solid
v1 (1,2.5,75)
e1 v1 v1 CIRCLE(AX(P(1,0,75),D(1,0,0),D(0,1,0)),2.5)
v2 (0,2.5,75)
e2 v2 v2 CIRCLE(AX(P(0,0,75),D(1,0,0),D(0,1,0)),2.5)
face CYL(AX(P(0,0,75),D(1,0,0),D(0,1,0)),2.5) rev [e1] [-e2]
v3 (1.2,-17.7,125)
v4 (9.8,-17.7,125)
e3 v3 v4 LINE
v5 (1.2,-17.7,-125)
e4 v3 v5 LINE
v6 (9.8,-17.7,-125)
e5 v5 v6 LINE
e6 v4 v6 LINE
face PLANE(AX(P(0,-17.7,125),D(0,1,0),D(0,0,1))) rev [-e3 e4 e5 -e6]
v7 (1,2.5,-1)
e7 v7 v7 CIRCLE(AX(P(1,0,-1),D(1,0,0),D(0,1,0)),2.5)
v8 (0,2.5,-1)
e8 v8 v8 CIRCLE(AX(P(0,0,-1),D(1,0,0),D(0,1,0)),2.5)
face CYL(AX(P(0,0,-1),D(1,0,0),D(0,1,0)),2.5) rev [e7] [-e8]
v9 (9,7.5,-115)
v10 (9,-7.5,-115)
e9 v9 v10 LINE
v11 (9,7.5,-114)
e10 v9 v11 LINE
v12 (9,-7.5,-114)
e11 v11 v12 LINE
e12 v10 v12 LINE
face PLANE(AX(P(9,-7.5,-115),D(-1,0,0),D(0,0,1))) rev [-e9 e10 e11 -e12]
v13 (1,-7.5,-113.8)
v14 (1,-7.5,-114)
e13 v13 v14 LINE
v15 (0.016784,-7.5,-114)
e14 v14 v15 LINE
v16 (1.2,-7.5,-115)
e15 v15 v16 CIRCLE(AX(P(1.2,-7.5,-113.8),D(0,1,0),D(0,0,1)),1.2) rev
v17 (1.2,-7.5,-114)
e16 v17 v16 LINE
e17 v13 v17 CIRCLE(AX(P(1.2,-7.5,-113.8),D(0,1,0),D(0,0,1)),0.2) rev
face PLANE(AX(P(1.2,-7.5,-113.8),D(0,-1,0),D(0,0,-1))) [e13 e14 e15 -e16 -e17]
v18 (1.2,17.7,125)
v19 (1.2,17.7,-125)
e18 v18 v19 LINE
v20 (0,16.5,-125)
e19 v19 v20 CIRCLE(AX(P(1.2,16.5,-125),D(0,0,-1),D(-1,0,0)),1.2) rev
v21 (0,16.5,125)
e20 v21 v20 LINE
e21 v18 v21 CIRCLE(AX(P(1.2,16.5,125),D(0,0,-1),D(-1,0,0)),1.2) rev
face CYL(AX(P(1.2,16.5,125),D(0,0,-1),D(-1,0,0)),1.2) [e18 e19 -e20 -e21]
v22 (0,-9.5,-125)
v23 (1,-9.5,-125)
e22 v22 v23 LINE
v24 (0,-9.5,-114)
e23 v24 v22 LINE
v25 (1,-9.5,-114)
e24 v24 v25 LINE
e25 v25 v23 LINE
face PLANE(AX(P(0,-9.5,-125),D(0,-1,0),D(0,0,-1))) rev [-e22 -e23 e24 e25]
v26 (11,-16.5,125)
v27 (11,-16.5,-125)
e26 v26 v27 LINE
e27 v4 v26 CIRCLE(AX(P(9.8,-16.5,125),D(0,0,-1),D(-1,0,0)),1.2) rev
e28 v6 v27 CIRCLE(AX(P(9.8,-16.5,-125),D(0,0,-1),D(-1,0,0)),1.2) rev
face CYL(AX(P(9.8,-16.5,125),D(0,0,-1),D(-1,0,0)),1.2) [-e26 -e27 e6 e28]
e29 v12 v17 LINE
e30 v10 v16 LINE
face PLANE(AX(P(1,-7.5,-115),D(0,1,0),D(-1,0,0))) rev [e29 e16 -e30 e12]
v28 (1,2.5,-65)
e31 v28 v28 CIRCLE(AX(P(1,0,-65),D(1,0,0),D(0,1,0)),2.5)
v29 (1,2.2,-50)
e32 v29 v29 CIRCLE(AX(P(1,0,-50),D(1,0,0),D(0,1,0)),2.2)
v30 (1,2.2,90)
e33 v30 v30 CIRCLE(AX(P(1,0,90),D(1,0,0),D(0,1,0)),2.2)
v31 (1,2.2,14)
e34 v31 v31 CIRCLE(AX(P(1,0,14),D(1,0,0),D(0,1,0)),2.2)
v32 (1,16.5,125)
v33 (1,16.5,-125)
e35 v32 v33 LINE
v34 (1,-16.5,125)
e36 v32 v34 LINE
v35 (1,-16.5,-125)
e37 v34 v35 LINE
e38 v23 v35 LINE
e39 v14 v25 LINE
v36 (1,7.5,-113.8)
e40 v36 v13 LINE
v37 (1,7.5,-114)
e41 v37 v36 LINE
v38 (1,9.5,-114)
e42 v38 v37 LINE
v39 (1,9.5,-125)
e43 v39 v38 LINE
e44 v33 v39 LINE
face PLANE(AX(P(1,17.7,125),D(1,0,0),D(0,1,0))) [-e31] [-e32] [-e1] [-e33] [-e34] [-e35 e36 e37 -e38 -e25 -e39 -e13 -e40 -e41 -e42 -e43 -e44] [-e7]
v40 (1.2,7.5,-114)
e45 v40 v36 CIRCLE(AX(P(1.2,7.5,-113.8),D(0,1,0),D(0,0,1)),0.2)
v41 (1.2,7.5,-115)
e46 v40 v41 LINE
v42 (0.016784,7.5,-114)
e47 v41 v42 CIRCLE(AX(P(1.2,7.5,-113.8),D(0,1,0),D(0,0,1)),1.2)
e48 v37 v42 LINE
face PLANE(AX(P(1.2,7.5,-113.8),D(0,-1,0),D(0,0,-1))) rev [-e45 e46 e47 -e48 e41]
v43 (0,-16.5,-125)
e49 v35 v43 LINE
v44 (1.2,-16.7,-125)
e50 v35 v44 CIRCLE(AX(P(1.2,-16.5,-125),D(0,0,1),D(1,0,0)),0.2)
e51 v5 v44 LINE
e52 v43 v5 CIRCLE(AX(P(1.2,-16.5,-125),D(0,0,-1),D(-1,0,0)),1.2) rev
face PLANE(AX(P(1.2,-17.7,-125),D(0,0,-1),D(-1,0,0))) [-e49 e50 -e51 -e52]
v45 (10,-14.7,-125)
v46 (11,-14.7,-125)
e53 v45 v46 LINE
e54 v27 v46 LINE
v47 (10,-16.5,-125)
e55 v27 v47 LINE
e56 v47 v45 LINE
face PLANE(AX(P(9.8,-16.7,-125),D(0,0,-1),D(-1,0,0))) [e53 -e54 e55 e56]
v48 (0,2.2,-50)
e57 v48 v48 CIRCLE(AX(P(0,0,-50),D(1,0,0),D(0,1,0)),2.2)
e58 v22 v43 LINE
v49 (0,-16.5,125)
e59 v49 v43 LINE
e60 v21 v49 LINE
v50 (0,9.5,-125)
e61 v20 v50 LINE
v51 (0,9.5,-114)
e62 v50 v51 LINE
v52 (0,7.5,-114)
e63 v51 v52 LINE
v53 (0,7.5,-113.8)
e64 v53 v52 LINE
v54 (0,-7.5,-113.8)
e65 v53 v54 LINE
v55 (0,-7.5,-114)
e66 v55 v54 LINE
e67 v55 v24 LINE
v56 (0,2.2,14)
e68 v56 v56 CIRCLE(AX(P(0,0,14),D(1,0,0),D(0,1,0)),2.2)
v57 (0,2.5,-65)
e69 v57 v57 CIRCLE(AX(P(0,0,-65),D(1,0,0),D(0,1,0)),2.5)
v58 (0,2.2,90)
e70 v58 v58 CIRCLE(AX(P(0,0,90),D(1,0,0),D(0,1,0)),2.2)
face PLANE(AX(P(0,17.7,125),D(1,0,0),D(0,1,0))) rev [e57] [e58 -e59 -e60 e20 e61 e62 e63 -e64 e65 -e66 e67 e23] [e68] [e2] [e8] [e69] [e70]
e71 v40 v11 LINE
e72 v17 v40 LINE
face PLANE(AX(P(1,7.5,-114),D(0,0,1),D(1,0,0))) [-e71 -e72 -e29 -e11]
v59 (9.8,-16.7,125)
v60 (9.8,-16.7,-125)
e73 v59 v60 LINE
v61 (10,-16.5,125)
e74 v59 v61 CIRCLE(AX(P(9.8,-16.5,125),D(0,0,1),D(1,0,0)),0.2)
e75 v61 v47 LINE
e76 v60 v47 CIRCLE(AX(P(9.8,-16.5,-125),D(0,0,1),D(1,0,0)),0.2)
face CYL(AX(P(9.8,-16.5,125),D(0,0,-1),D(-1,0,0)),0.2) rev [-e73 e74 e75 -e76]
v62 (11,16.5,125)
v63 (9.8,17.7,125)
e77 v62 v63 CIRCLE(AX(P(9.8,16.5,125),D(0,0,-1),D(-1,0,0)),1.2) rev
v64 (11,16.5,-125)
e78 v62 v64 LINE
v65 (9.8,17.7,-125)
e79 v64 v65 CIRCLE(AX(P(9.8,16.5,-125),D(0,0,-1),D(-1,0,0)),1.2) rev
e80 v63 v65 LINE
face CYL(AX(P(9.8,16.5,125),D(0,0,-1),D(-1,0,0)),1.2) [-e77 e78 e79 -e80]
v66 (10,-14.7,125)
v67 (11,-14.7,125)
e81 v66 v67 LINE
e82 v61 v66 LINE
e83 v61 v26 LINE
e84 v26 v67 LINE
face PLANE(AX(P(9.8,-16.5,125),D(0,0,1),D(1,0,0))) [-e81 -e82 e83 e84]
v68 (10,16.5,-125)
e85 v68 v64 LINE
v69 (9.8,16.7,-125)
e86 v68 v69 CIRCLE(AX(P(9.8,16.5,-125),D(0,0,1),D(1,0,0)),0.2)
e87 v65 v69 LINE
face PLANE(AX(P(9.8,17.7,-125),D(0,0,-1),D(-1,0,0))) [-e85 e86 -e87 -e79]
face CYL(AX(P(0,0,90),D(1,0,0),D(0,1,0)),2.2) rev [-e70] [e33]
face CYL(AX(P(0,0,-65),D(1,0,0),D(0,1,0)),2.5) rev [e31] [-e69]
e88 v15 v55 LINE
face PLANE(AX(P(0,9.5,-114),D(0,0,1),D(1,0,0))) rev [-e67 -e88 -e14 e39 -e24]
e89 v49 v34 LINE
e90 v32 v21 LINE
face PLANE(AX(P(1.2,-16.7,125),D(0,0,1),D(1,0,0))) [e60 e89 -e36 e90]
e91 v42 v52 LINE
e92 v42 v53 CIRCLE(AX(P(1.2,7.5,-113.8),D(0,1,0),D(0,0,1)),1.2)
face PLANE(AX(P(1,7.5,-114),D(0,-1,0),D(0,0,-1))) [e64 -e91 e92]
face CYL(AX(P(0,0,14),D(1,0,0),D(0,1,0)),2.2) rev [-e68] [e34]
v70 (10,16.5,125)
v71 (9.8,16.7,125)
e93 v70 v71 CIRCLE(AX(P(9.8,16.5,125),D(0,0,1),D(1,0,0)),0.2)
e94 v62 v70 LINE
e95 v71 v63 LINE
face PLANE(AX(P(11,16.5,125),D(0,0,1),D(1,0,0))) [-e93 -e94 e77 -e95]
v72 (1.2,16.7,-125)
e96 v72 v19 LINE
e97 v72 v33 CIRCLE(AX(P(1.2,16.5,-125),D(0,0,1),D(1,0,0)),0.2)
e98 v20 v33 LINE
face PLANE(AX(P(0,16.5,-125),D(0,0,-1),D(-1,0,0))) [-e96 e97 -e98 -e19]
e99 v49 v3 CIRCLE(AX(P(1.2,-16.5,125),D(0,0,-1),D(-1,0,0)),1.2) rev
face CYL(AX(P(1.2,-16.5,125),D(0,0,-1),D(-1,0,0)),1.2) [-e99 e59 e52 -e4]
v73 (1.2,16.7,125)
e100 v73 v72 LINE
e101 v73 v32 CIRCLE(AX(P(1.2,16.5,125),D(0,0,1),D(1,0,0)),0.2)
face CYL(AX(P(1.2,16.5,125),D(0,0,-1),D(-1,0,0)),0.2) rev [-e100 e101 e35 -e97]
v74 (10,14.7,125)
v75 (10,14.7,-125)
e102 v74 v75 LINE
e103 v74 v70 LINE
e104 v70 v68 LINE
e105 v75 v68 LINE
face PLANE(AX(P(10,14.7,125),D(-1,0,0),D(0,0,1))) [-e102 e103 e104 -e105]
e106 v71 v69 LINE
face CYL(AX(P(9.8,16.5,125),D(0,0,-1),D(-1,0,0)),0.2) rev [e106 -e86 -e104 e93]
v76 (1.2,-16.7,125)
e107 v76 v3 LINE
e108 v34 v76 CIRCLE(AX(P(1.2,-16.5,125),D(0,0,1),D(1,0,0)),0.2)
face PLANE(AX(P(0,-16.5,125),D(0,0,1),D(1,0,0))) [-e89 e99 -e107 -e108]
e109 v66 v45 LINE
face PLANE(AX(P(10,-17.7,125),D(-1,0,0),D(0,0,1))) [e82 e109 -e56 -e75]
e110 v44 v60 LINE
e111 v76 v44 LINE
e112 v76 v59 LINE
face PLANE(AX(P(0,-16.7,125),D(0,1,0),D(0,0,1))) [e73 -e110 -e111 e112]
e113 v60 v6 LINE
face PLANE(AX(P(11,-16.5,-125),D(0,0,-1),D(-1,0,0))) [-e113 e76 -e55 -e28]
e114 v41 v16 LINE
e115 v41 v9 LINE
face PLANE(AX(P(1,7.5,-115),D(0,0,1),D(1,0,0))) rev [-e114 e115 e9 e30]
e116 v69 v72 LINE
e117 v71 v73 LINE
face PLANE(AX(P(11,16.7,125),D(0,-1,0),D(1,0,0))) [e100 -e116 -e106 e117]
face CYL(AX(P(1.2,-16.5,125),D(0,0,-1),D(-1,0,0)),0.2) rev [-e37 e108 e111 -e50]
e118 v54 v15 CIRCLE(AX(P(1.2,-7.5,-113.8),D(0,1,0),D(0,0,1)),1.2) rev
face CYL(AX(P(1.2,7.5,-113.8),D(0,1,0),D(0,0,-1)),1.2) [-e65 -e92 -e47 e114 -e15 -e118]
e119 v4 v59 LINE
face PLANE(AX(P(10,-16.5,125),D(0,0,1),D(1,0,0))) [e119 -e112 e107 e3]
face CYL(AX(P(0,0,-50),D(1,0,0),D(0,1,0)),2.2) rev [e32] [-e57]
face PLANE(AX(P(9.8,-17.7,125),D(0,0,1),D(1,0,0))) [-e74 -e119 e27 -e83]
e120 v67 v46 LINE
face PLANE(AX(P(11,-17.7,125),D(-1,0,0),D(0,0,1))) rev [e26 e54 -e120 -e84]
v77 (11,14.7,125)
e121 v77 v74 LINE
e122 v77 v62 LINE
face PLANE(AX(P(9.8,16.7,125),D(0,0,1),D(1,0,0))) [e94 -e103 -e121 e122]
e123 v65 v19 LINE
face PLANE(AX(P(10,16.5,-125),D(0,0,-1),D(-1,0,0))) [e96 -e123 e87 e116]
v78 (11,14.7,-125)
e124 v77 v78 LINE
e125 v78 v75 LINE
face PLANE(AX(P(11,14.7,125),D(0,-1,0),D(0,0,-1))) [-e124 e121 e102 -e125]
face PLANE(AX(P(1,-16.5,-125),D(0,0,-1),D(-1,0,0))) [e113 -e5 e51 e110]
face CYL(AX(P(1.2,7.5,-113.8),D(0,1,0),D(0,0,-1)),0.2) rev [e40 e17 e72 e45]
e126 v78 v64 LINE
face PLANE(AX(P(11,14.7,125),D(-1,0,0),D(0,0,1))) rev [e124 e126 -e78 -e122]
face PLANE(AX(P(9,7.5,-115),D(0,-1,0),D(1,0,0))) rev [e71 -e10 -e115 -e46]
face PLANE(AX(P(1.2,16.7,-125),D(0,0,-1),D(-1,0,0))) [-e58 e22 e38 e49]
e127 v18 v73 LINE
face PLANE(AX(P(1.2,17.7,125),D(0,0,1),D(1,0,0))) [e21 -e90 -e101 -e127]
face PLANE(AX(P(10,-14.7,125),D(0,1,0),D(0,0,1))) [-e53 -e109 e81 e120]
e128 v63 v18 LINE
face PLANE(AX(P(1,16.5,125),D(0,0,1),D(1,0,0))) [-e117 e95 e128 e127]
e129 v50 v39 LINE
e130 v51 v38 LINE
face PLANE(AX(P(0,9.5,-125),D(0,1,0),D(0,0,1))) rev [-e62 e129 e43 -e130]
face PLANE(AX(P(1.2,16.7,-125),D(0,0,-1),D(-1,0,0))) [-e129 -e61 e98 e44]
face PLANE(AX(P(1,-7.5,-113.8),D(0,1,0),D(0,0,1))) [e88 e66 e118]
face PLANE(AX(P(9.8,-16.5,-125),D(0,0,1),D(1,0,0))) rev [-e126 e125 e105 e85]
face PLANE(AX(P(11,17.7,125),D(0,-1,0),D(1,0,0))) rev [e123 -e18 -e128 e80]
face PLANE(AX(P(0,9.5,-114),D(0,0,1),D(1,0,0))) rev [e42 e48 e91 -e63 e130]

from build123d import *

# Parameters (mm, degrees)
SM_BASE_FLANGE_1_DEPTH           = 125
SKETCH_3_W                       = 11
SKETCH_3_H                       = 19
CUT_EXTRUDE_1_DEPTH              = 1
SM_EDGE_FLANGE_1_STRIP_W         = 4.4
SM_EDGE_FLANGE_1_STRIP_H         = 1
SM_EDGE_FLANGE_1_STRIP_CUT_DEPTH = 15
SM_EDGE_FLANGE_1_DEPTH           = 15
SKETCH_7_R                       = 2.5
SKETCH_7_R_2                     = 2.2
CUT_EXTRUDE_2_DEPTH              = 1
SKETCH_8_R                       = 2.2
SKETCH_8_R_2                     = 2.5
CUT_EXTRUDE_3_DEPTH              = 1


# Sheet-metal steps are written as plain solids
with BuildPart() as part:
    # Sketch 1 → Базовая кромка1 (new, symmetric)
    with BuildSketch(Plane.XY):
        with BuildLine():
            Line((11, 14.7), (11, 16.5))
            ThreePointArc((11, 16.5), (10.648528137, 17.348528137), (9.8, 17.7))
            Line((9.8, 17.7), (1.2, 17.7))
            ThreePointArc((1.2, 17.7), (0.351471863, 17.348528137), (0, 16.5))
            Line((0, 16.5), (0, -16.5))
            ThreePointArc((0, -16.5), (0.351471863, -17.348528137), (1.2, -17.7))
            Line((1.2, -17.7), (9.8, -17.7))
            ThreePointArc((9.8, -17.7), (10.648528137, -17.348528137), (11, -16.5))
            Line((11, -16.5), (11, -14.7))
            Line((11, -14.7), (10, -14.7))
            Line((10, -14.7), (10, -16.5))
            ThreePointArc((10, -16.5), (9.941421356, -16.641421356), (9.8, -16.7))
            Line((9.8, -16.7), (1.2, -16.7))
            ThreePointArc((1.2, -16.7), (1.058578644, -16.641421356), (1, -16.5))
            Line((1, -16.5), (1, 16.5))
            ThreePointArc((1, 16.5), (1.058578644, 16.641421356), (1.2, 16.7))
            Line((1.2, 16.7), (9.8, 16.7))
            ThreePointArc((9.8, 16.7), (9.941421356, 16.641421356), (10, 16.5))
            Line((10, 16.5), (10, 14.7))
            Line((10, 14.7), (11, 14.7))
        make_face()
    extrude(amount=SM_BASE_FLANGE_1_DEPTH, both=True)

    # Эскиз3 → Вытянуть1 (cut)
    with BuildSketch(Plane(origin=(1, 0, 0), x_dir=(0, 0, -1), z_dir=(1, 0, 0))):
        with Locations((119.5, 0)):
            Rectangle(SKETCH_3_W, SKETCH_3_H)
    extrude(amount=-CUT_EXTRUDE_1_DEPTH, mode=Mode.SUBTRACT)

    # Ребро-кромка1 strip (across the edge) → Ребро-кромка1 strip cut (cut)
    with BuildSketch(Plane(origin=(1, -7.5, -114), x_dir=(0, 0, 1), z_dir=(0, 1, 0))):
        with Locations((-2, -0.5)):
            Rectangle(SM_EDGE_FLANGE_1_STRIP_W, SM_EDGE_FLANGE_1_STRIP_H)
    extrude(amount=SM_EDGE_FLANGE_1_STRIP_CUT_DEPTH, mode=Mode.SUBTRACT)

    # Ребро-кромка1 section (across the edge) → Ребро-кромка1 (add)
    with BuildSketch(Plane(origin=(1, -7.5, -114), x_dir=(0, 0, 1), z_dir=(0, 1, 0))):
        with BuildLine():
            Line((-1, 0.2), (-1, 8))
            Line((-1, 8), (0, 8))
            Line((0, 8), (0, 0.2))
            ThreePointArc((0, 0.2), (0.058578644, 0.058578644), (0.2, 0))
            Line((0.2, 0), (0.2, -1))
            ThreePointArc((0.2, -1), (-0.648528137, -0.648528137), (-1, 0.2))
        make_face()
    extrude(amount=SM_EDGE_FLANGE_1_DEPTH)

    # Эскиз7 → Вытянуть2 (cut)
    with BuildSketch(Plane(origin=(1, 0, 0), x_dir=(0, 0, -1), z_dir=(1, 0, 0))):
        with Locations(Location((65, 0, 0), (0, 0, 90))):
            Circle(SKETCH_7_R)
        with Locations(Location((50, 0, 0), (0, 0, 90))):
            Circle(SKETCH_7_R_2)
        with Locations(Location((1, 0, 0), (0, 0, 90))):
            Circle(SKETCH_7_R)
        with Locations(Location((-14, 0, 0), (0, 0, 90))):
            Circle(SKETCH_7_R_2)
    extrude(amount=-CUT_EXTRUDE_2_DEPTH, mode=Mode.SUBTRACT)

    # Эскиз8 → Вытянуть3 (cut)
    with BuildSketch(Plane(origin=(1, 0, 0), x_dir=(0, 0, -1), z_dir=(1, 0, 0))):
        with Locations(Location((-90, 0, 0), (0, 0, 90))):
            Circle(SKETCH_8_R)
        with Locations(Location((-75, 0, 0), (0, 0, 90))):
            Circle(SKETCH_8_R_2)
    extrude(amount=-CUT_EXTRUDE_3_DEPTH, mode=Mode.SUBTRACT)


solid = part.part
